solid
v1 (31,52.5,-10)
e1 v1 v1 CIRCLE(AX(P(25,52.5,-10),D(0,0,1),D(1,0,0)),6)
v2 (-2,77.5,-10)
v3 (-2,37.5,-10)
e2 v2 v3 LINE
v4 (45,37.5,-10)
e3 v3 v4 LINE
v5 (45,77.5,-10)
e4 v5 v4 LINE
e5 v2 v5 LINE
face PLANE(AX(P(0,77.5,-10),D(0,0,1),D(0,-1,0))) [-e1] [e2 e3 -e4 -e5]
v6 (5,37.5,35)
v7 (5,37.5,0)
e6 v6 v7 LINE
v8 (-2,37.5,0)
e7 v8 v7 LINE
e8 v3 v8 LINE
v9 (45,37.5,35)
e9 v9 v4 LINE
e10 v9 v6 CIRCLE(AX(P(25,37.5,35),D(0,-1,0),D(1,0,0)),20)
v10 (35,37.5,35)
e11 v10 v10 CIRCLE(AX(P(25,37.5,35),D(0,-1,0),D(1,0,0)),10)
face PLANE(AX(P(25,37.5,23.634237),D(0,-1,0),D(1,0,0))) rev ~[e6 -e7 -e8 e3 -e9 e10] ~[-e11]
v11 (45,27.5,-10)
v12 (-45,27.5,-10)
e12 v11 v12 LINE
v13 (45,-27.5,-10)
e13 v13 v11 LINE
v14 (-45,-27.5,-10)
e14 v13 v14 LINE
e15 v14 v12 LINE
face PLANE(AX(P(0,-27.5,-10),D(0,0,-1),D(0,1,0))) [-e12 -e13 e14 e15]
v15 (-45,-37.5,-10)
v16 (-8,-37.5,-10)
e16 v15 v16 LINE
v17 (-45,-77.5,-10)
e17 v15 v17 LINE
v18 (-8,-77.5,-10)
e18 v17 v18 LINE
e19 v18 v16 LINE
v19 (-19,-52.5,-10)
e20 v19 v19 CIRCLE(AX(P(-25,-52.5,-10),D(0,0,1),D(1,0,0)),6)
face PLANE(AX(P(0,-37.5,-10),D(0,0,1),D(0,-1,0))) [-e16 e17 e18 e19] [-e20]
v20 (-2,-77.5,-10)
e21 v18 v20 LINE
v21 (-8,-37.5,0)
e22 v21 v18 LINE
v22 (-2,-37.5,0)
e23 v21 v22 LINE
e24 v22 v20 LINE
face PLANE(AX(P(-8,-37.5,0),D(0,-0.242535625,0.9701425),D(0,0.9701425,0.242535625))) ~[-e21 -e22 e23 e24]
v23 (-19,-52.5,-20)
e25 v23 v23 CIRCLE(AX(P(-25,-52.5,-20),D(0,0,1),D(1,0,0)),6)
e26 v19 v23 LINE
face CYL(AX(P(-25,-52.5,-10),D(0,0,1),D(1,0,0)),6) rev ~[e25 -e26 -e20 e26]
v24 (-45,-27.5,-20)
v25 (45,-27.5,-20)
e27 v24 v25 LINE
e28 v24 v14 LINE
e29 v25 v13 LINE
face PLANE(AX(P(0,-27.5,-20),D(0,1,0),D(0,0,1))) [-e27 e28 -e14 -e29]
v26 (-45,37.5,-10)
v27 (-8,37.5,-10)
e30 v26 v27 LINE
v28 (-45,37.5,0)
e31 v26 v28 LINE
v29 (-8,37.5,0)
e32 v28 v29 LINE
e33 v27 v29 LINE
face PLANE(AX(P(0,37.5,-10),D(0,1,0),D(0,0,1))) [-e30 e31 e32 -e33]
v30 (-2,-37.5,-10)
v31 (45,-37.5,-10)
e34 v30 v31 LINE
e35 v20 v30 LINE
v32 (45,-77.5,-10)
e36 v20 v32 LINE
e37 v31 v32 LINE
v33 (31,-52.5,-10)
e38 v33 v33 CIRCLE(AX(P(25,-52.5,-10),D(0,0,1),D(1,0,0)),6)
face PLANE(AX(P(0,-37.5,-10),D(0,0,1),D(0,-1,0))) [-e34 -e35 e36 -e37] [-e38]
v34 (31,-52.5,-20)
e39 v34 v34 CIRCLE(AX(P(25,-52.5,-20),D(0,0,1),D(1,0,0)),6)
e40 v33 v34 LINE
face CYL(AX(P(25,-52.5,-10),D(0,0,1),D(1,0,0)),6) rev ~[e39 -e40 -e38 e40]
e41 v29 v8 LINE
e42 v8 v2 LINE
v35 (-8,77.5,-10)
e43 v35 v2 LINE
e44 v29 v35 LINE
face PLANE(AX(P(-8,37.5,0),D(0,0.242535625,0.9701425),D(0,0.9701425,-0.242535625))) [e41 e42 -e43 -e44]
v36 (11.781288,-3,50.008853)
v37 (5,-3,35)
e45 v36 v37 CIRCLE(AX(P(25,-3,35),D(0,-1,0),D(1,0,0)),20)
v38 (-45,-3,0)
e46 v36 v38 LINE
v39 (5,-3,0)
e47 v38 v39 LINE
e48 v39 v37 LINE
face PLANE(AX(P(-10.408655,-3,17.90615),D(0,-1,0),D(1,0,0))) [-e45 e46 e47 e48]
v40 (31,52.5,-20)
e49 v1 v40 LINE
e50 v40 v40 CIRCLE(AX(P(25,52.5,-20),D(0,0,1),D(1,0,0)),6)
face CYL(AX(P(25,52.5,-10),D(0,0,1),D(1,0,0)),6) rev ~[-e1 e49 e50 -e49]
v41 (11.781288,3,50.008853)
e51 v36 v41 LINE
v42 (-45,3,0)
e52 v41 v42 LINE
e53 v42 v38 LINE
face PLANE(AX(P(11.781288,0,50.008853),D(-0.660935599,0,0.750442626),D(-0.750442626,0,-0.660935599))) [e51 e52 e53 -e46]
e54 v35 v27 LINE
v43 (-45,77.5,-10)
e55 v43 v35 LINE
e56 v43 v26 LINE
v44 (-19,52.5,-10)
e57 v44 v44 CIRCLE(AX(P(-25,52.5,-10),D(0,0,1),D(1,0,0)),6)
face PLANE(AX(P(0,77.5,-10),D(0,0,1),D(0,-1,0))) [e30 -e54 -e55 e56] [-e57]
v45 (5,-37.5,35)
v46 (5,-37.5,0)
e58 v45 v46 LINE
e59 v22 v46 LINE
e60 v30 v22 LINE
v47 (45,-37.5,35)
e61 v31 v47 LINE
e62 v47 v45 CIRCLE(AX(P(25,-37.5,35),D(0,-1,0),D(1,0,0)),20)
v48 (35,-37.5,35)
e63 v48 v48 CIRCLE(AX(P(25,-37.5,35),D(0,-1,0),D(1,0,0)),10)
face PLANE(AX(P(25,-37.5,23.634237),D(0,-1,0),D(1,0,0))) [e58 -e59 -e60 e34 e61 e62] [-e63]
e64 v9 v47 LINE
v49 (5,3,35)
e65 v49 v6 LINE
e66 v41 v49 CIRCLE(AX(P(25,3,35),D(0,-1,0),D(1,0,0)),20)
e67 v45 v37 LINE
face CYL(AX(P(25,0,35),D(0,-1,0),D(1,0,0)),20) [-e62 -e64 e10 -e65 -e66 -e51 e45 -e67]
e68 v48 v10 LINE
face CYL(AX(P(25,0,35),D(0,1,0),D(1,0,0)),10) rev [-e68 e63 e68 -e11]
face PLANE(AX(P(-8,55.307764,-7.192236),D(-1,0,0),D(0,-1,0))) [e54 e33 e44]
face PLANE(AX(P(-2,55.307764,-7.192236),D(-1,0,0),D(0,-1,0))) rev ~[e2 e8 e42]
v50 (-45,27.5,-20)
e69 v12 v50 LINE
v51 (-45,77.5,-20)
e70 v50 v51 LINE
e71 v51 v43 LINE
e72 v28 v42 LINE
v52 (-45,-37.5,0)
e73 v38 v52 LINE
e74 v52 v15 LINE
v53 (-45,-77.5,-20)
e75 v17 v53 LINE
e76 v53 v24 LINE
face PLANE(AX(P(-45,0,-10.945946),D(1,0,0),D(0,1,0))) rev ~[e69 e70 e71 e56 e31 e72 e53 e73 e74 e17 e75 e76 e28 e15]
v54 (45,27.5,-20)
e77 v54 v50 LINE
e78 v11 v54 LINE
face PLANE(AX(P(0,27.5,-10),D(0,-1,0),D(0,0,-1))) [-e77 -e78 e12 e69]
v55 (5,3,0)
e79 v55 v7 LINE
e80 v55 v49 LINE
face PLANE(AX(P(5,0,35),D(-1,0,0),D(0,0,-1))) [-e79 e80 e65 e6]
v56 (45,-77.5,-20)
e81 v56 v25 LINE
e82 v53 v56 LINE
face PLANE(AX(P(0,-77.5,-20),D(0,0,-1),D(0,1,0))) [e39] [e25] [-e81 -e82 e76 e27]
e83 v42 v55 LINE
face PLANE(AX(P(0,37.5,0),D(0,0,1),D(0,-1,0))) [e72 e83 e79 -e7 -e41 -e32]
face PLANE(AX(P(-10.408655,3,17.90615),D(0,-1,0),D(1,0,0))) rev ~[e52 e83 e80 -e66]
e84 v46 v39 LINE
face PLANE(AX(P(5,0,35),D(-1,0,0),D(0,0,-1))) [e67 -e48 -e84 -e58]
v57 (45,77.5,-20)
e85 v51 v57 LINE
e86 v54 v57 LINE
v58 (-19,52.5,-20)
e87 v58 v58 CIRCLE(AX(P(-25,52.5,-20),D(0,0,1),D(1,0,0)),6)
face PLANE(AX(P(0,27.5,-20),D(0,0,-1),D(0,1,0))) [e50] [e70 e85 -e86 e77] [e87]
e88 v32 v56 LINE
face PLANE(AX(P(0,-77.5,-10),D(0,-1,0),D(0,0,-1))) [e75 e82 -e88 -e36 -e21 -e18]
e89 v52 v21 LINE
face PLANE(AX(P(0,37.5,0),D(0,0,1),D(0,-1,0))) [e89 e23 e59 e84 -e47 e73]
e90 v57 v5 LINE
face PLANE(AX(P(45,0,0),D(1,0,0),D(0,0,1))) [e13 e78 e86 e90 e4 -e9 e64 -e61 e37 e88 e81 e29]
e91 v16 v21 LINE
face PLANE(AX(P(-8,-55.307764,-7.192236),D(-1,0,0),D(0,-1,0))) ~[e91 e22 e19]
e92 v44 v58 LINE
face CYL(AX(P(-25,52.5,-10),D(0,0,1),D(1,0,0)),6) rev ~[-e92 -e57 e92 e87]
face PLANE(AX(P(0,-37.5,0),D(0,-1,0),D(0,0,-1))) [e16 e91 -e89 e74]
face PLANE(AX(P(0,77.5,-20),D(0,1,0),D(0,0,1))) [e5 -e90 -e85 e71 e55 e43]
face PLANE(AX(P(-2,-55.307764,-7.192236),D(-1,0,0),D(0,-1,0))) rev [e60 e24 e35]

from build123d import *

# Parameters (mm, degrees)
F1_DEPTH  = 45
F2_R      = 6
F3_DEPTH  = 10.001
F6_DEPTH  = 6
F7_R      = 10
F8_DEPTH  = 37.5
F10_DEPTH = 3


# Not quite as in the source:
# - a pattern or mirror of a feature is missing from the dataset's text; its kind, count and spacing are read off the source's solid


with BuildPart() as f1:
    # F0 (on Right) → F1 (new body, symmetric)
    with BuildSketch(Plane.YZ):
        Polygon((27.5, -20), (77.5, -20), (77.5, -10), (37.5, -10), (37.5, 0), (-37.5, 0), (-37.5, -10), (-77.5, -10), (-77.5, -20), (-27.5, -20), (-27.5, -10), (27.5, -10), align=None)
    extrude(amount=F1_DEPTH, both=True)

    # F2 (on face) → F3 (cut, through all)
    with BuildSketch(Plane.XY.offset(-10)):
        with Locations((25, -52.5)):
            Circle(F2_R)
        with Locations((-25, -52.5)):
            Circle(F2_R)
        with Locations((-25, 52.5)):
            Circle(F2_R)
        with Locations((25, 52.5)):
            Circle(F2_R)
    extrude(amount=-F3_DEPTH, mode=Mode.SUBTRACT)

    # F5 (on offset) → F6 (join)
    with BuildSketch(Plane(origin=(-8, 0, 0), x_dir=(0, -1, 0), z_dir=(-1, 0, 0))):
        Polygon((-37.5, -10), (-37.5, 0), (-77.5, -10), align=None)
    f6 = extrude(amount=-F6_DEPTH)

    # F6_copies: F6 across plane
    add(f6.mirror(Plane(origin=(0, 0, 0), x_dir=(0, 0, -1), z_dir=(0, -1, 0))))

    # F7 (on Front) → F8 (join, symmetric)
    with BuildSketch(Plane.XZ):
        with BuildLine():
            Line((5, 0), (45, 0))
            Line((45, 0), (45, 35))
            ThreePointArc((45, 35), (25, 55), (5, 35))
            Line((5, 35), (5, 0))
        make_face()
        with Locations((25, 35)):
            Circle(F7_R, mode=Mode.SUBTRACT)
    extrude(amount=F8_DEPTH, both=True)

    # F9 (on Front) → F10 (join, symmetric)
    with BuildSketch(Plane.XZ):
        Polygon((11.7812880283, 50.0088525148), (-45, 0), (5, 0), align=None)
    extrude(amount=F10_DEPTH, both=True)


solid = f1.part
